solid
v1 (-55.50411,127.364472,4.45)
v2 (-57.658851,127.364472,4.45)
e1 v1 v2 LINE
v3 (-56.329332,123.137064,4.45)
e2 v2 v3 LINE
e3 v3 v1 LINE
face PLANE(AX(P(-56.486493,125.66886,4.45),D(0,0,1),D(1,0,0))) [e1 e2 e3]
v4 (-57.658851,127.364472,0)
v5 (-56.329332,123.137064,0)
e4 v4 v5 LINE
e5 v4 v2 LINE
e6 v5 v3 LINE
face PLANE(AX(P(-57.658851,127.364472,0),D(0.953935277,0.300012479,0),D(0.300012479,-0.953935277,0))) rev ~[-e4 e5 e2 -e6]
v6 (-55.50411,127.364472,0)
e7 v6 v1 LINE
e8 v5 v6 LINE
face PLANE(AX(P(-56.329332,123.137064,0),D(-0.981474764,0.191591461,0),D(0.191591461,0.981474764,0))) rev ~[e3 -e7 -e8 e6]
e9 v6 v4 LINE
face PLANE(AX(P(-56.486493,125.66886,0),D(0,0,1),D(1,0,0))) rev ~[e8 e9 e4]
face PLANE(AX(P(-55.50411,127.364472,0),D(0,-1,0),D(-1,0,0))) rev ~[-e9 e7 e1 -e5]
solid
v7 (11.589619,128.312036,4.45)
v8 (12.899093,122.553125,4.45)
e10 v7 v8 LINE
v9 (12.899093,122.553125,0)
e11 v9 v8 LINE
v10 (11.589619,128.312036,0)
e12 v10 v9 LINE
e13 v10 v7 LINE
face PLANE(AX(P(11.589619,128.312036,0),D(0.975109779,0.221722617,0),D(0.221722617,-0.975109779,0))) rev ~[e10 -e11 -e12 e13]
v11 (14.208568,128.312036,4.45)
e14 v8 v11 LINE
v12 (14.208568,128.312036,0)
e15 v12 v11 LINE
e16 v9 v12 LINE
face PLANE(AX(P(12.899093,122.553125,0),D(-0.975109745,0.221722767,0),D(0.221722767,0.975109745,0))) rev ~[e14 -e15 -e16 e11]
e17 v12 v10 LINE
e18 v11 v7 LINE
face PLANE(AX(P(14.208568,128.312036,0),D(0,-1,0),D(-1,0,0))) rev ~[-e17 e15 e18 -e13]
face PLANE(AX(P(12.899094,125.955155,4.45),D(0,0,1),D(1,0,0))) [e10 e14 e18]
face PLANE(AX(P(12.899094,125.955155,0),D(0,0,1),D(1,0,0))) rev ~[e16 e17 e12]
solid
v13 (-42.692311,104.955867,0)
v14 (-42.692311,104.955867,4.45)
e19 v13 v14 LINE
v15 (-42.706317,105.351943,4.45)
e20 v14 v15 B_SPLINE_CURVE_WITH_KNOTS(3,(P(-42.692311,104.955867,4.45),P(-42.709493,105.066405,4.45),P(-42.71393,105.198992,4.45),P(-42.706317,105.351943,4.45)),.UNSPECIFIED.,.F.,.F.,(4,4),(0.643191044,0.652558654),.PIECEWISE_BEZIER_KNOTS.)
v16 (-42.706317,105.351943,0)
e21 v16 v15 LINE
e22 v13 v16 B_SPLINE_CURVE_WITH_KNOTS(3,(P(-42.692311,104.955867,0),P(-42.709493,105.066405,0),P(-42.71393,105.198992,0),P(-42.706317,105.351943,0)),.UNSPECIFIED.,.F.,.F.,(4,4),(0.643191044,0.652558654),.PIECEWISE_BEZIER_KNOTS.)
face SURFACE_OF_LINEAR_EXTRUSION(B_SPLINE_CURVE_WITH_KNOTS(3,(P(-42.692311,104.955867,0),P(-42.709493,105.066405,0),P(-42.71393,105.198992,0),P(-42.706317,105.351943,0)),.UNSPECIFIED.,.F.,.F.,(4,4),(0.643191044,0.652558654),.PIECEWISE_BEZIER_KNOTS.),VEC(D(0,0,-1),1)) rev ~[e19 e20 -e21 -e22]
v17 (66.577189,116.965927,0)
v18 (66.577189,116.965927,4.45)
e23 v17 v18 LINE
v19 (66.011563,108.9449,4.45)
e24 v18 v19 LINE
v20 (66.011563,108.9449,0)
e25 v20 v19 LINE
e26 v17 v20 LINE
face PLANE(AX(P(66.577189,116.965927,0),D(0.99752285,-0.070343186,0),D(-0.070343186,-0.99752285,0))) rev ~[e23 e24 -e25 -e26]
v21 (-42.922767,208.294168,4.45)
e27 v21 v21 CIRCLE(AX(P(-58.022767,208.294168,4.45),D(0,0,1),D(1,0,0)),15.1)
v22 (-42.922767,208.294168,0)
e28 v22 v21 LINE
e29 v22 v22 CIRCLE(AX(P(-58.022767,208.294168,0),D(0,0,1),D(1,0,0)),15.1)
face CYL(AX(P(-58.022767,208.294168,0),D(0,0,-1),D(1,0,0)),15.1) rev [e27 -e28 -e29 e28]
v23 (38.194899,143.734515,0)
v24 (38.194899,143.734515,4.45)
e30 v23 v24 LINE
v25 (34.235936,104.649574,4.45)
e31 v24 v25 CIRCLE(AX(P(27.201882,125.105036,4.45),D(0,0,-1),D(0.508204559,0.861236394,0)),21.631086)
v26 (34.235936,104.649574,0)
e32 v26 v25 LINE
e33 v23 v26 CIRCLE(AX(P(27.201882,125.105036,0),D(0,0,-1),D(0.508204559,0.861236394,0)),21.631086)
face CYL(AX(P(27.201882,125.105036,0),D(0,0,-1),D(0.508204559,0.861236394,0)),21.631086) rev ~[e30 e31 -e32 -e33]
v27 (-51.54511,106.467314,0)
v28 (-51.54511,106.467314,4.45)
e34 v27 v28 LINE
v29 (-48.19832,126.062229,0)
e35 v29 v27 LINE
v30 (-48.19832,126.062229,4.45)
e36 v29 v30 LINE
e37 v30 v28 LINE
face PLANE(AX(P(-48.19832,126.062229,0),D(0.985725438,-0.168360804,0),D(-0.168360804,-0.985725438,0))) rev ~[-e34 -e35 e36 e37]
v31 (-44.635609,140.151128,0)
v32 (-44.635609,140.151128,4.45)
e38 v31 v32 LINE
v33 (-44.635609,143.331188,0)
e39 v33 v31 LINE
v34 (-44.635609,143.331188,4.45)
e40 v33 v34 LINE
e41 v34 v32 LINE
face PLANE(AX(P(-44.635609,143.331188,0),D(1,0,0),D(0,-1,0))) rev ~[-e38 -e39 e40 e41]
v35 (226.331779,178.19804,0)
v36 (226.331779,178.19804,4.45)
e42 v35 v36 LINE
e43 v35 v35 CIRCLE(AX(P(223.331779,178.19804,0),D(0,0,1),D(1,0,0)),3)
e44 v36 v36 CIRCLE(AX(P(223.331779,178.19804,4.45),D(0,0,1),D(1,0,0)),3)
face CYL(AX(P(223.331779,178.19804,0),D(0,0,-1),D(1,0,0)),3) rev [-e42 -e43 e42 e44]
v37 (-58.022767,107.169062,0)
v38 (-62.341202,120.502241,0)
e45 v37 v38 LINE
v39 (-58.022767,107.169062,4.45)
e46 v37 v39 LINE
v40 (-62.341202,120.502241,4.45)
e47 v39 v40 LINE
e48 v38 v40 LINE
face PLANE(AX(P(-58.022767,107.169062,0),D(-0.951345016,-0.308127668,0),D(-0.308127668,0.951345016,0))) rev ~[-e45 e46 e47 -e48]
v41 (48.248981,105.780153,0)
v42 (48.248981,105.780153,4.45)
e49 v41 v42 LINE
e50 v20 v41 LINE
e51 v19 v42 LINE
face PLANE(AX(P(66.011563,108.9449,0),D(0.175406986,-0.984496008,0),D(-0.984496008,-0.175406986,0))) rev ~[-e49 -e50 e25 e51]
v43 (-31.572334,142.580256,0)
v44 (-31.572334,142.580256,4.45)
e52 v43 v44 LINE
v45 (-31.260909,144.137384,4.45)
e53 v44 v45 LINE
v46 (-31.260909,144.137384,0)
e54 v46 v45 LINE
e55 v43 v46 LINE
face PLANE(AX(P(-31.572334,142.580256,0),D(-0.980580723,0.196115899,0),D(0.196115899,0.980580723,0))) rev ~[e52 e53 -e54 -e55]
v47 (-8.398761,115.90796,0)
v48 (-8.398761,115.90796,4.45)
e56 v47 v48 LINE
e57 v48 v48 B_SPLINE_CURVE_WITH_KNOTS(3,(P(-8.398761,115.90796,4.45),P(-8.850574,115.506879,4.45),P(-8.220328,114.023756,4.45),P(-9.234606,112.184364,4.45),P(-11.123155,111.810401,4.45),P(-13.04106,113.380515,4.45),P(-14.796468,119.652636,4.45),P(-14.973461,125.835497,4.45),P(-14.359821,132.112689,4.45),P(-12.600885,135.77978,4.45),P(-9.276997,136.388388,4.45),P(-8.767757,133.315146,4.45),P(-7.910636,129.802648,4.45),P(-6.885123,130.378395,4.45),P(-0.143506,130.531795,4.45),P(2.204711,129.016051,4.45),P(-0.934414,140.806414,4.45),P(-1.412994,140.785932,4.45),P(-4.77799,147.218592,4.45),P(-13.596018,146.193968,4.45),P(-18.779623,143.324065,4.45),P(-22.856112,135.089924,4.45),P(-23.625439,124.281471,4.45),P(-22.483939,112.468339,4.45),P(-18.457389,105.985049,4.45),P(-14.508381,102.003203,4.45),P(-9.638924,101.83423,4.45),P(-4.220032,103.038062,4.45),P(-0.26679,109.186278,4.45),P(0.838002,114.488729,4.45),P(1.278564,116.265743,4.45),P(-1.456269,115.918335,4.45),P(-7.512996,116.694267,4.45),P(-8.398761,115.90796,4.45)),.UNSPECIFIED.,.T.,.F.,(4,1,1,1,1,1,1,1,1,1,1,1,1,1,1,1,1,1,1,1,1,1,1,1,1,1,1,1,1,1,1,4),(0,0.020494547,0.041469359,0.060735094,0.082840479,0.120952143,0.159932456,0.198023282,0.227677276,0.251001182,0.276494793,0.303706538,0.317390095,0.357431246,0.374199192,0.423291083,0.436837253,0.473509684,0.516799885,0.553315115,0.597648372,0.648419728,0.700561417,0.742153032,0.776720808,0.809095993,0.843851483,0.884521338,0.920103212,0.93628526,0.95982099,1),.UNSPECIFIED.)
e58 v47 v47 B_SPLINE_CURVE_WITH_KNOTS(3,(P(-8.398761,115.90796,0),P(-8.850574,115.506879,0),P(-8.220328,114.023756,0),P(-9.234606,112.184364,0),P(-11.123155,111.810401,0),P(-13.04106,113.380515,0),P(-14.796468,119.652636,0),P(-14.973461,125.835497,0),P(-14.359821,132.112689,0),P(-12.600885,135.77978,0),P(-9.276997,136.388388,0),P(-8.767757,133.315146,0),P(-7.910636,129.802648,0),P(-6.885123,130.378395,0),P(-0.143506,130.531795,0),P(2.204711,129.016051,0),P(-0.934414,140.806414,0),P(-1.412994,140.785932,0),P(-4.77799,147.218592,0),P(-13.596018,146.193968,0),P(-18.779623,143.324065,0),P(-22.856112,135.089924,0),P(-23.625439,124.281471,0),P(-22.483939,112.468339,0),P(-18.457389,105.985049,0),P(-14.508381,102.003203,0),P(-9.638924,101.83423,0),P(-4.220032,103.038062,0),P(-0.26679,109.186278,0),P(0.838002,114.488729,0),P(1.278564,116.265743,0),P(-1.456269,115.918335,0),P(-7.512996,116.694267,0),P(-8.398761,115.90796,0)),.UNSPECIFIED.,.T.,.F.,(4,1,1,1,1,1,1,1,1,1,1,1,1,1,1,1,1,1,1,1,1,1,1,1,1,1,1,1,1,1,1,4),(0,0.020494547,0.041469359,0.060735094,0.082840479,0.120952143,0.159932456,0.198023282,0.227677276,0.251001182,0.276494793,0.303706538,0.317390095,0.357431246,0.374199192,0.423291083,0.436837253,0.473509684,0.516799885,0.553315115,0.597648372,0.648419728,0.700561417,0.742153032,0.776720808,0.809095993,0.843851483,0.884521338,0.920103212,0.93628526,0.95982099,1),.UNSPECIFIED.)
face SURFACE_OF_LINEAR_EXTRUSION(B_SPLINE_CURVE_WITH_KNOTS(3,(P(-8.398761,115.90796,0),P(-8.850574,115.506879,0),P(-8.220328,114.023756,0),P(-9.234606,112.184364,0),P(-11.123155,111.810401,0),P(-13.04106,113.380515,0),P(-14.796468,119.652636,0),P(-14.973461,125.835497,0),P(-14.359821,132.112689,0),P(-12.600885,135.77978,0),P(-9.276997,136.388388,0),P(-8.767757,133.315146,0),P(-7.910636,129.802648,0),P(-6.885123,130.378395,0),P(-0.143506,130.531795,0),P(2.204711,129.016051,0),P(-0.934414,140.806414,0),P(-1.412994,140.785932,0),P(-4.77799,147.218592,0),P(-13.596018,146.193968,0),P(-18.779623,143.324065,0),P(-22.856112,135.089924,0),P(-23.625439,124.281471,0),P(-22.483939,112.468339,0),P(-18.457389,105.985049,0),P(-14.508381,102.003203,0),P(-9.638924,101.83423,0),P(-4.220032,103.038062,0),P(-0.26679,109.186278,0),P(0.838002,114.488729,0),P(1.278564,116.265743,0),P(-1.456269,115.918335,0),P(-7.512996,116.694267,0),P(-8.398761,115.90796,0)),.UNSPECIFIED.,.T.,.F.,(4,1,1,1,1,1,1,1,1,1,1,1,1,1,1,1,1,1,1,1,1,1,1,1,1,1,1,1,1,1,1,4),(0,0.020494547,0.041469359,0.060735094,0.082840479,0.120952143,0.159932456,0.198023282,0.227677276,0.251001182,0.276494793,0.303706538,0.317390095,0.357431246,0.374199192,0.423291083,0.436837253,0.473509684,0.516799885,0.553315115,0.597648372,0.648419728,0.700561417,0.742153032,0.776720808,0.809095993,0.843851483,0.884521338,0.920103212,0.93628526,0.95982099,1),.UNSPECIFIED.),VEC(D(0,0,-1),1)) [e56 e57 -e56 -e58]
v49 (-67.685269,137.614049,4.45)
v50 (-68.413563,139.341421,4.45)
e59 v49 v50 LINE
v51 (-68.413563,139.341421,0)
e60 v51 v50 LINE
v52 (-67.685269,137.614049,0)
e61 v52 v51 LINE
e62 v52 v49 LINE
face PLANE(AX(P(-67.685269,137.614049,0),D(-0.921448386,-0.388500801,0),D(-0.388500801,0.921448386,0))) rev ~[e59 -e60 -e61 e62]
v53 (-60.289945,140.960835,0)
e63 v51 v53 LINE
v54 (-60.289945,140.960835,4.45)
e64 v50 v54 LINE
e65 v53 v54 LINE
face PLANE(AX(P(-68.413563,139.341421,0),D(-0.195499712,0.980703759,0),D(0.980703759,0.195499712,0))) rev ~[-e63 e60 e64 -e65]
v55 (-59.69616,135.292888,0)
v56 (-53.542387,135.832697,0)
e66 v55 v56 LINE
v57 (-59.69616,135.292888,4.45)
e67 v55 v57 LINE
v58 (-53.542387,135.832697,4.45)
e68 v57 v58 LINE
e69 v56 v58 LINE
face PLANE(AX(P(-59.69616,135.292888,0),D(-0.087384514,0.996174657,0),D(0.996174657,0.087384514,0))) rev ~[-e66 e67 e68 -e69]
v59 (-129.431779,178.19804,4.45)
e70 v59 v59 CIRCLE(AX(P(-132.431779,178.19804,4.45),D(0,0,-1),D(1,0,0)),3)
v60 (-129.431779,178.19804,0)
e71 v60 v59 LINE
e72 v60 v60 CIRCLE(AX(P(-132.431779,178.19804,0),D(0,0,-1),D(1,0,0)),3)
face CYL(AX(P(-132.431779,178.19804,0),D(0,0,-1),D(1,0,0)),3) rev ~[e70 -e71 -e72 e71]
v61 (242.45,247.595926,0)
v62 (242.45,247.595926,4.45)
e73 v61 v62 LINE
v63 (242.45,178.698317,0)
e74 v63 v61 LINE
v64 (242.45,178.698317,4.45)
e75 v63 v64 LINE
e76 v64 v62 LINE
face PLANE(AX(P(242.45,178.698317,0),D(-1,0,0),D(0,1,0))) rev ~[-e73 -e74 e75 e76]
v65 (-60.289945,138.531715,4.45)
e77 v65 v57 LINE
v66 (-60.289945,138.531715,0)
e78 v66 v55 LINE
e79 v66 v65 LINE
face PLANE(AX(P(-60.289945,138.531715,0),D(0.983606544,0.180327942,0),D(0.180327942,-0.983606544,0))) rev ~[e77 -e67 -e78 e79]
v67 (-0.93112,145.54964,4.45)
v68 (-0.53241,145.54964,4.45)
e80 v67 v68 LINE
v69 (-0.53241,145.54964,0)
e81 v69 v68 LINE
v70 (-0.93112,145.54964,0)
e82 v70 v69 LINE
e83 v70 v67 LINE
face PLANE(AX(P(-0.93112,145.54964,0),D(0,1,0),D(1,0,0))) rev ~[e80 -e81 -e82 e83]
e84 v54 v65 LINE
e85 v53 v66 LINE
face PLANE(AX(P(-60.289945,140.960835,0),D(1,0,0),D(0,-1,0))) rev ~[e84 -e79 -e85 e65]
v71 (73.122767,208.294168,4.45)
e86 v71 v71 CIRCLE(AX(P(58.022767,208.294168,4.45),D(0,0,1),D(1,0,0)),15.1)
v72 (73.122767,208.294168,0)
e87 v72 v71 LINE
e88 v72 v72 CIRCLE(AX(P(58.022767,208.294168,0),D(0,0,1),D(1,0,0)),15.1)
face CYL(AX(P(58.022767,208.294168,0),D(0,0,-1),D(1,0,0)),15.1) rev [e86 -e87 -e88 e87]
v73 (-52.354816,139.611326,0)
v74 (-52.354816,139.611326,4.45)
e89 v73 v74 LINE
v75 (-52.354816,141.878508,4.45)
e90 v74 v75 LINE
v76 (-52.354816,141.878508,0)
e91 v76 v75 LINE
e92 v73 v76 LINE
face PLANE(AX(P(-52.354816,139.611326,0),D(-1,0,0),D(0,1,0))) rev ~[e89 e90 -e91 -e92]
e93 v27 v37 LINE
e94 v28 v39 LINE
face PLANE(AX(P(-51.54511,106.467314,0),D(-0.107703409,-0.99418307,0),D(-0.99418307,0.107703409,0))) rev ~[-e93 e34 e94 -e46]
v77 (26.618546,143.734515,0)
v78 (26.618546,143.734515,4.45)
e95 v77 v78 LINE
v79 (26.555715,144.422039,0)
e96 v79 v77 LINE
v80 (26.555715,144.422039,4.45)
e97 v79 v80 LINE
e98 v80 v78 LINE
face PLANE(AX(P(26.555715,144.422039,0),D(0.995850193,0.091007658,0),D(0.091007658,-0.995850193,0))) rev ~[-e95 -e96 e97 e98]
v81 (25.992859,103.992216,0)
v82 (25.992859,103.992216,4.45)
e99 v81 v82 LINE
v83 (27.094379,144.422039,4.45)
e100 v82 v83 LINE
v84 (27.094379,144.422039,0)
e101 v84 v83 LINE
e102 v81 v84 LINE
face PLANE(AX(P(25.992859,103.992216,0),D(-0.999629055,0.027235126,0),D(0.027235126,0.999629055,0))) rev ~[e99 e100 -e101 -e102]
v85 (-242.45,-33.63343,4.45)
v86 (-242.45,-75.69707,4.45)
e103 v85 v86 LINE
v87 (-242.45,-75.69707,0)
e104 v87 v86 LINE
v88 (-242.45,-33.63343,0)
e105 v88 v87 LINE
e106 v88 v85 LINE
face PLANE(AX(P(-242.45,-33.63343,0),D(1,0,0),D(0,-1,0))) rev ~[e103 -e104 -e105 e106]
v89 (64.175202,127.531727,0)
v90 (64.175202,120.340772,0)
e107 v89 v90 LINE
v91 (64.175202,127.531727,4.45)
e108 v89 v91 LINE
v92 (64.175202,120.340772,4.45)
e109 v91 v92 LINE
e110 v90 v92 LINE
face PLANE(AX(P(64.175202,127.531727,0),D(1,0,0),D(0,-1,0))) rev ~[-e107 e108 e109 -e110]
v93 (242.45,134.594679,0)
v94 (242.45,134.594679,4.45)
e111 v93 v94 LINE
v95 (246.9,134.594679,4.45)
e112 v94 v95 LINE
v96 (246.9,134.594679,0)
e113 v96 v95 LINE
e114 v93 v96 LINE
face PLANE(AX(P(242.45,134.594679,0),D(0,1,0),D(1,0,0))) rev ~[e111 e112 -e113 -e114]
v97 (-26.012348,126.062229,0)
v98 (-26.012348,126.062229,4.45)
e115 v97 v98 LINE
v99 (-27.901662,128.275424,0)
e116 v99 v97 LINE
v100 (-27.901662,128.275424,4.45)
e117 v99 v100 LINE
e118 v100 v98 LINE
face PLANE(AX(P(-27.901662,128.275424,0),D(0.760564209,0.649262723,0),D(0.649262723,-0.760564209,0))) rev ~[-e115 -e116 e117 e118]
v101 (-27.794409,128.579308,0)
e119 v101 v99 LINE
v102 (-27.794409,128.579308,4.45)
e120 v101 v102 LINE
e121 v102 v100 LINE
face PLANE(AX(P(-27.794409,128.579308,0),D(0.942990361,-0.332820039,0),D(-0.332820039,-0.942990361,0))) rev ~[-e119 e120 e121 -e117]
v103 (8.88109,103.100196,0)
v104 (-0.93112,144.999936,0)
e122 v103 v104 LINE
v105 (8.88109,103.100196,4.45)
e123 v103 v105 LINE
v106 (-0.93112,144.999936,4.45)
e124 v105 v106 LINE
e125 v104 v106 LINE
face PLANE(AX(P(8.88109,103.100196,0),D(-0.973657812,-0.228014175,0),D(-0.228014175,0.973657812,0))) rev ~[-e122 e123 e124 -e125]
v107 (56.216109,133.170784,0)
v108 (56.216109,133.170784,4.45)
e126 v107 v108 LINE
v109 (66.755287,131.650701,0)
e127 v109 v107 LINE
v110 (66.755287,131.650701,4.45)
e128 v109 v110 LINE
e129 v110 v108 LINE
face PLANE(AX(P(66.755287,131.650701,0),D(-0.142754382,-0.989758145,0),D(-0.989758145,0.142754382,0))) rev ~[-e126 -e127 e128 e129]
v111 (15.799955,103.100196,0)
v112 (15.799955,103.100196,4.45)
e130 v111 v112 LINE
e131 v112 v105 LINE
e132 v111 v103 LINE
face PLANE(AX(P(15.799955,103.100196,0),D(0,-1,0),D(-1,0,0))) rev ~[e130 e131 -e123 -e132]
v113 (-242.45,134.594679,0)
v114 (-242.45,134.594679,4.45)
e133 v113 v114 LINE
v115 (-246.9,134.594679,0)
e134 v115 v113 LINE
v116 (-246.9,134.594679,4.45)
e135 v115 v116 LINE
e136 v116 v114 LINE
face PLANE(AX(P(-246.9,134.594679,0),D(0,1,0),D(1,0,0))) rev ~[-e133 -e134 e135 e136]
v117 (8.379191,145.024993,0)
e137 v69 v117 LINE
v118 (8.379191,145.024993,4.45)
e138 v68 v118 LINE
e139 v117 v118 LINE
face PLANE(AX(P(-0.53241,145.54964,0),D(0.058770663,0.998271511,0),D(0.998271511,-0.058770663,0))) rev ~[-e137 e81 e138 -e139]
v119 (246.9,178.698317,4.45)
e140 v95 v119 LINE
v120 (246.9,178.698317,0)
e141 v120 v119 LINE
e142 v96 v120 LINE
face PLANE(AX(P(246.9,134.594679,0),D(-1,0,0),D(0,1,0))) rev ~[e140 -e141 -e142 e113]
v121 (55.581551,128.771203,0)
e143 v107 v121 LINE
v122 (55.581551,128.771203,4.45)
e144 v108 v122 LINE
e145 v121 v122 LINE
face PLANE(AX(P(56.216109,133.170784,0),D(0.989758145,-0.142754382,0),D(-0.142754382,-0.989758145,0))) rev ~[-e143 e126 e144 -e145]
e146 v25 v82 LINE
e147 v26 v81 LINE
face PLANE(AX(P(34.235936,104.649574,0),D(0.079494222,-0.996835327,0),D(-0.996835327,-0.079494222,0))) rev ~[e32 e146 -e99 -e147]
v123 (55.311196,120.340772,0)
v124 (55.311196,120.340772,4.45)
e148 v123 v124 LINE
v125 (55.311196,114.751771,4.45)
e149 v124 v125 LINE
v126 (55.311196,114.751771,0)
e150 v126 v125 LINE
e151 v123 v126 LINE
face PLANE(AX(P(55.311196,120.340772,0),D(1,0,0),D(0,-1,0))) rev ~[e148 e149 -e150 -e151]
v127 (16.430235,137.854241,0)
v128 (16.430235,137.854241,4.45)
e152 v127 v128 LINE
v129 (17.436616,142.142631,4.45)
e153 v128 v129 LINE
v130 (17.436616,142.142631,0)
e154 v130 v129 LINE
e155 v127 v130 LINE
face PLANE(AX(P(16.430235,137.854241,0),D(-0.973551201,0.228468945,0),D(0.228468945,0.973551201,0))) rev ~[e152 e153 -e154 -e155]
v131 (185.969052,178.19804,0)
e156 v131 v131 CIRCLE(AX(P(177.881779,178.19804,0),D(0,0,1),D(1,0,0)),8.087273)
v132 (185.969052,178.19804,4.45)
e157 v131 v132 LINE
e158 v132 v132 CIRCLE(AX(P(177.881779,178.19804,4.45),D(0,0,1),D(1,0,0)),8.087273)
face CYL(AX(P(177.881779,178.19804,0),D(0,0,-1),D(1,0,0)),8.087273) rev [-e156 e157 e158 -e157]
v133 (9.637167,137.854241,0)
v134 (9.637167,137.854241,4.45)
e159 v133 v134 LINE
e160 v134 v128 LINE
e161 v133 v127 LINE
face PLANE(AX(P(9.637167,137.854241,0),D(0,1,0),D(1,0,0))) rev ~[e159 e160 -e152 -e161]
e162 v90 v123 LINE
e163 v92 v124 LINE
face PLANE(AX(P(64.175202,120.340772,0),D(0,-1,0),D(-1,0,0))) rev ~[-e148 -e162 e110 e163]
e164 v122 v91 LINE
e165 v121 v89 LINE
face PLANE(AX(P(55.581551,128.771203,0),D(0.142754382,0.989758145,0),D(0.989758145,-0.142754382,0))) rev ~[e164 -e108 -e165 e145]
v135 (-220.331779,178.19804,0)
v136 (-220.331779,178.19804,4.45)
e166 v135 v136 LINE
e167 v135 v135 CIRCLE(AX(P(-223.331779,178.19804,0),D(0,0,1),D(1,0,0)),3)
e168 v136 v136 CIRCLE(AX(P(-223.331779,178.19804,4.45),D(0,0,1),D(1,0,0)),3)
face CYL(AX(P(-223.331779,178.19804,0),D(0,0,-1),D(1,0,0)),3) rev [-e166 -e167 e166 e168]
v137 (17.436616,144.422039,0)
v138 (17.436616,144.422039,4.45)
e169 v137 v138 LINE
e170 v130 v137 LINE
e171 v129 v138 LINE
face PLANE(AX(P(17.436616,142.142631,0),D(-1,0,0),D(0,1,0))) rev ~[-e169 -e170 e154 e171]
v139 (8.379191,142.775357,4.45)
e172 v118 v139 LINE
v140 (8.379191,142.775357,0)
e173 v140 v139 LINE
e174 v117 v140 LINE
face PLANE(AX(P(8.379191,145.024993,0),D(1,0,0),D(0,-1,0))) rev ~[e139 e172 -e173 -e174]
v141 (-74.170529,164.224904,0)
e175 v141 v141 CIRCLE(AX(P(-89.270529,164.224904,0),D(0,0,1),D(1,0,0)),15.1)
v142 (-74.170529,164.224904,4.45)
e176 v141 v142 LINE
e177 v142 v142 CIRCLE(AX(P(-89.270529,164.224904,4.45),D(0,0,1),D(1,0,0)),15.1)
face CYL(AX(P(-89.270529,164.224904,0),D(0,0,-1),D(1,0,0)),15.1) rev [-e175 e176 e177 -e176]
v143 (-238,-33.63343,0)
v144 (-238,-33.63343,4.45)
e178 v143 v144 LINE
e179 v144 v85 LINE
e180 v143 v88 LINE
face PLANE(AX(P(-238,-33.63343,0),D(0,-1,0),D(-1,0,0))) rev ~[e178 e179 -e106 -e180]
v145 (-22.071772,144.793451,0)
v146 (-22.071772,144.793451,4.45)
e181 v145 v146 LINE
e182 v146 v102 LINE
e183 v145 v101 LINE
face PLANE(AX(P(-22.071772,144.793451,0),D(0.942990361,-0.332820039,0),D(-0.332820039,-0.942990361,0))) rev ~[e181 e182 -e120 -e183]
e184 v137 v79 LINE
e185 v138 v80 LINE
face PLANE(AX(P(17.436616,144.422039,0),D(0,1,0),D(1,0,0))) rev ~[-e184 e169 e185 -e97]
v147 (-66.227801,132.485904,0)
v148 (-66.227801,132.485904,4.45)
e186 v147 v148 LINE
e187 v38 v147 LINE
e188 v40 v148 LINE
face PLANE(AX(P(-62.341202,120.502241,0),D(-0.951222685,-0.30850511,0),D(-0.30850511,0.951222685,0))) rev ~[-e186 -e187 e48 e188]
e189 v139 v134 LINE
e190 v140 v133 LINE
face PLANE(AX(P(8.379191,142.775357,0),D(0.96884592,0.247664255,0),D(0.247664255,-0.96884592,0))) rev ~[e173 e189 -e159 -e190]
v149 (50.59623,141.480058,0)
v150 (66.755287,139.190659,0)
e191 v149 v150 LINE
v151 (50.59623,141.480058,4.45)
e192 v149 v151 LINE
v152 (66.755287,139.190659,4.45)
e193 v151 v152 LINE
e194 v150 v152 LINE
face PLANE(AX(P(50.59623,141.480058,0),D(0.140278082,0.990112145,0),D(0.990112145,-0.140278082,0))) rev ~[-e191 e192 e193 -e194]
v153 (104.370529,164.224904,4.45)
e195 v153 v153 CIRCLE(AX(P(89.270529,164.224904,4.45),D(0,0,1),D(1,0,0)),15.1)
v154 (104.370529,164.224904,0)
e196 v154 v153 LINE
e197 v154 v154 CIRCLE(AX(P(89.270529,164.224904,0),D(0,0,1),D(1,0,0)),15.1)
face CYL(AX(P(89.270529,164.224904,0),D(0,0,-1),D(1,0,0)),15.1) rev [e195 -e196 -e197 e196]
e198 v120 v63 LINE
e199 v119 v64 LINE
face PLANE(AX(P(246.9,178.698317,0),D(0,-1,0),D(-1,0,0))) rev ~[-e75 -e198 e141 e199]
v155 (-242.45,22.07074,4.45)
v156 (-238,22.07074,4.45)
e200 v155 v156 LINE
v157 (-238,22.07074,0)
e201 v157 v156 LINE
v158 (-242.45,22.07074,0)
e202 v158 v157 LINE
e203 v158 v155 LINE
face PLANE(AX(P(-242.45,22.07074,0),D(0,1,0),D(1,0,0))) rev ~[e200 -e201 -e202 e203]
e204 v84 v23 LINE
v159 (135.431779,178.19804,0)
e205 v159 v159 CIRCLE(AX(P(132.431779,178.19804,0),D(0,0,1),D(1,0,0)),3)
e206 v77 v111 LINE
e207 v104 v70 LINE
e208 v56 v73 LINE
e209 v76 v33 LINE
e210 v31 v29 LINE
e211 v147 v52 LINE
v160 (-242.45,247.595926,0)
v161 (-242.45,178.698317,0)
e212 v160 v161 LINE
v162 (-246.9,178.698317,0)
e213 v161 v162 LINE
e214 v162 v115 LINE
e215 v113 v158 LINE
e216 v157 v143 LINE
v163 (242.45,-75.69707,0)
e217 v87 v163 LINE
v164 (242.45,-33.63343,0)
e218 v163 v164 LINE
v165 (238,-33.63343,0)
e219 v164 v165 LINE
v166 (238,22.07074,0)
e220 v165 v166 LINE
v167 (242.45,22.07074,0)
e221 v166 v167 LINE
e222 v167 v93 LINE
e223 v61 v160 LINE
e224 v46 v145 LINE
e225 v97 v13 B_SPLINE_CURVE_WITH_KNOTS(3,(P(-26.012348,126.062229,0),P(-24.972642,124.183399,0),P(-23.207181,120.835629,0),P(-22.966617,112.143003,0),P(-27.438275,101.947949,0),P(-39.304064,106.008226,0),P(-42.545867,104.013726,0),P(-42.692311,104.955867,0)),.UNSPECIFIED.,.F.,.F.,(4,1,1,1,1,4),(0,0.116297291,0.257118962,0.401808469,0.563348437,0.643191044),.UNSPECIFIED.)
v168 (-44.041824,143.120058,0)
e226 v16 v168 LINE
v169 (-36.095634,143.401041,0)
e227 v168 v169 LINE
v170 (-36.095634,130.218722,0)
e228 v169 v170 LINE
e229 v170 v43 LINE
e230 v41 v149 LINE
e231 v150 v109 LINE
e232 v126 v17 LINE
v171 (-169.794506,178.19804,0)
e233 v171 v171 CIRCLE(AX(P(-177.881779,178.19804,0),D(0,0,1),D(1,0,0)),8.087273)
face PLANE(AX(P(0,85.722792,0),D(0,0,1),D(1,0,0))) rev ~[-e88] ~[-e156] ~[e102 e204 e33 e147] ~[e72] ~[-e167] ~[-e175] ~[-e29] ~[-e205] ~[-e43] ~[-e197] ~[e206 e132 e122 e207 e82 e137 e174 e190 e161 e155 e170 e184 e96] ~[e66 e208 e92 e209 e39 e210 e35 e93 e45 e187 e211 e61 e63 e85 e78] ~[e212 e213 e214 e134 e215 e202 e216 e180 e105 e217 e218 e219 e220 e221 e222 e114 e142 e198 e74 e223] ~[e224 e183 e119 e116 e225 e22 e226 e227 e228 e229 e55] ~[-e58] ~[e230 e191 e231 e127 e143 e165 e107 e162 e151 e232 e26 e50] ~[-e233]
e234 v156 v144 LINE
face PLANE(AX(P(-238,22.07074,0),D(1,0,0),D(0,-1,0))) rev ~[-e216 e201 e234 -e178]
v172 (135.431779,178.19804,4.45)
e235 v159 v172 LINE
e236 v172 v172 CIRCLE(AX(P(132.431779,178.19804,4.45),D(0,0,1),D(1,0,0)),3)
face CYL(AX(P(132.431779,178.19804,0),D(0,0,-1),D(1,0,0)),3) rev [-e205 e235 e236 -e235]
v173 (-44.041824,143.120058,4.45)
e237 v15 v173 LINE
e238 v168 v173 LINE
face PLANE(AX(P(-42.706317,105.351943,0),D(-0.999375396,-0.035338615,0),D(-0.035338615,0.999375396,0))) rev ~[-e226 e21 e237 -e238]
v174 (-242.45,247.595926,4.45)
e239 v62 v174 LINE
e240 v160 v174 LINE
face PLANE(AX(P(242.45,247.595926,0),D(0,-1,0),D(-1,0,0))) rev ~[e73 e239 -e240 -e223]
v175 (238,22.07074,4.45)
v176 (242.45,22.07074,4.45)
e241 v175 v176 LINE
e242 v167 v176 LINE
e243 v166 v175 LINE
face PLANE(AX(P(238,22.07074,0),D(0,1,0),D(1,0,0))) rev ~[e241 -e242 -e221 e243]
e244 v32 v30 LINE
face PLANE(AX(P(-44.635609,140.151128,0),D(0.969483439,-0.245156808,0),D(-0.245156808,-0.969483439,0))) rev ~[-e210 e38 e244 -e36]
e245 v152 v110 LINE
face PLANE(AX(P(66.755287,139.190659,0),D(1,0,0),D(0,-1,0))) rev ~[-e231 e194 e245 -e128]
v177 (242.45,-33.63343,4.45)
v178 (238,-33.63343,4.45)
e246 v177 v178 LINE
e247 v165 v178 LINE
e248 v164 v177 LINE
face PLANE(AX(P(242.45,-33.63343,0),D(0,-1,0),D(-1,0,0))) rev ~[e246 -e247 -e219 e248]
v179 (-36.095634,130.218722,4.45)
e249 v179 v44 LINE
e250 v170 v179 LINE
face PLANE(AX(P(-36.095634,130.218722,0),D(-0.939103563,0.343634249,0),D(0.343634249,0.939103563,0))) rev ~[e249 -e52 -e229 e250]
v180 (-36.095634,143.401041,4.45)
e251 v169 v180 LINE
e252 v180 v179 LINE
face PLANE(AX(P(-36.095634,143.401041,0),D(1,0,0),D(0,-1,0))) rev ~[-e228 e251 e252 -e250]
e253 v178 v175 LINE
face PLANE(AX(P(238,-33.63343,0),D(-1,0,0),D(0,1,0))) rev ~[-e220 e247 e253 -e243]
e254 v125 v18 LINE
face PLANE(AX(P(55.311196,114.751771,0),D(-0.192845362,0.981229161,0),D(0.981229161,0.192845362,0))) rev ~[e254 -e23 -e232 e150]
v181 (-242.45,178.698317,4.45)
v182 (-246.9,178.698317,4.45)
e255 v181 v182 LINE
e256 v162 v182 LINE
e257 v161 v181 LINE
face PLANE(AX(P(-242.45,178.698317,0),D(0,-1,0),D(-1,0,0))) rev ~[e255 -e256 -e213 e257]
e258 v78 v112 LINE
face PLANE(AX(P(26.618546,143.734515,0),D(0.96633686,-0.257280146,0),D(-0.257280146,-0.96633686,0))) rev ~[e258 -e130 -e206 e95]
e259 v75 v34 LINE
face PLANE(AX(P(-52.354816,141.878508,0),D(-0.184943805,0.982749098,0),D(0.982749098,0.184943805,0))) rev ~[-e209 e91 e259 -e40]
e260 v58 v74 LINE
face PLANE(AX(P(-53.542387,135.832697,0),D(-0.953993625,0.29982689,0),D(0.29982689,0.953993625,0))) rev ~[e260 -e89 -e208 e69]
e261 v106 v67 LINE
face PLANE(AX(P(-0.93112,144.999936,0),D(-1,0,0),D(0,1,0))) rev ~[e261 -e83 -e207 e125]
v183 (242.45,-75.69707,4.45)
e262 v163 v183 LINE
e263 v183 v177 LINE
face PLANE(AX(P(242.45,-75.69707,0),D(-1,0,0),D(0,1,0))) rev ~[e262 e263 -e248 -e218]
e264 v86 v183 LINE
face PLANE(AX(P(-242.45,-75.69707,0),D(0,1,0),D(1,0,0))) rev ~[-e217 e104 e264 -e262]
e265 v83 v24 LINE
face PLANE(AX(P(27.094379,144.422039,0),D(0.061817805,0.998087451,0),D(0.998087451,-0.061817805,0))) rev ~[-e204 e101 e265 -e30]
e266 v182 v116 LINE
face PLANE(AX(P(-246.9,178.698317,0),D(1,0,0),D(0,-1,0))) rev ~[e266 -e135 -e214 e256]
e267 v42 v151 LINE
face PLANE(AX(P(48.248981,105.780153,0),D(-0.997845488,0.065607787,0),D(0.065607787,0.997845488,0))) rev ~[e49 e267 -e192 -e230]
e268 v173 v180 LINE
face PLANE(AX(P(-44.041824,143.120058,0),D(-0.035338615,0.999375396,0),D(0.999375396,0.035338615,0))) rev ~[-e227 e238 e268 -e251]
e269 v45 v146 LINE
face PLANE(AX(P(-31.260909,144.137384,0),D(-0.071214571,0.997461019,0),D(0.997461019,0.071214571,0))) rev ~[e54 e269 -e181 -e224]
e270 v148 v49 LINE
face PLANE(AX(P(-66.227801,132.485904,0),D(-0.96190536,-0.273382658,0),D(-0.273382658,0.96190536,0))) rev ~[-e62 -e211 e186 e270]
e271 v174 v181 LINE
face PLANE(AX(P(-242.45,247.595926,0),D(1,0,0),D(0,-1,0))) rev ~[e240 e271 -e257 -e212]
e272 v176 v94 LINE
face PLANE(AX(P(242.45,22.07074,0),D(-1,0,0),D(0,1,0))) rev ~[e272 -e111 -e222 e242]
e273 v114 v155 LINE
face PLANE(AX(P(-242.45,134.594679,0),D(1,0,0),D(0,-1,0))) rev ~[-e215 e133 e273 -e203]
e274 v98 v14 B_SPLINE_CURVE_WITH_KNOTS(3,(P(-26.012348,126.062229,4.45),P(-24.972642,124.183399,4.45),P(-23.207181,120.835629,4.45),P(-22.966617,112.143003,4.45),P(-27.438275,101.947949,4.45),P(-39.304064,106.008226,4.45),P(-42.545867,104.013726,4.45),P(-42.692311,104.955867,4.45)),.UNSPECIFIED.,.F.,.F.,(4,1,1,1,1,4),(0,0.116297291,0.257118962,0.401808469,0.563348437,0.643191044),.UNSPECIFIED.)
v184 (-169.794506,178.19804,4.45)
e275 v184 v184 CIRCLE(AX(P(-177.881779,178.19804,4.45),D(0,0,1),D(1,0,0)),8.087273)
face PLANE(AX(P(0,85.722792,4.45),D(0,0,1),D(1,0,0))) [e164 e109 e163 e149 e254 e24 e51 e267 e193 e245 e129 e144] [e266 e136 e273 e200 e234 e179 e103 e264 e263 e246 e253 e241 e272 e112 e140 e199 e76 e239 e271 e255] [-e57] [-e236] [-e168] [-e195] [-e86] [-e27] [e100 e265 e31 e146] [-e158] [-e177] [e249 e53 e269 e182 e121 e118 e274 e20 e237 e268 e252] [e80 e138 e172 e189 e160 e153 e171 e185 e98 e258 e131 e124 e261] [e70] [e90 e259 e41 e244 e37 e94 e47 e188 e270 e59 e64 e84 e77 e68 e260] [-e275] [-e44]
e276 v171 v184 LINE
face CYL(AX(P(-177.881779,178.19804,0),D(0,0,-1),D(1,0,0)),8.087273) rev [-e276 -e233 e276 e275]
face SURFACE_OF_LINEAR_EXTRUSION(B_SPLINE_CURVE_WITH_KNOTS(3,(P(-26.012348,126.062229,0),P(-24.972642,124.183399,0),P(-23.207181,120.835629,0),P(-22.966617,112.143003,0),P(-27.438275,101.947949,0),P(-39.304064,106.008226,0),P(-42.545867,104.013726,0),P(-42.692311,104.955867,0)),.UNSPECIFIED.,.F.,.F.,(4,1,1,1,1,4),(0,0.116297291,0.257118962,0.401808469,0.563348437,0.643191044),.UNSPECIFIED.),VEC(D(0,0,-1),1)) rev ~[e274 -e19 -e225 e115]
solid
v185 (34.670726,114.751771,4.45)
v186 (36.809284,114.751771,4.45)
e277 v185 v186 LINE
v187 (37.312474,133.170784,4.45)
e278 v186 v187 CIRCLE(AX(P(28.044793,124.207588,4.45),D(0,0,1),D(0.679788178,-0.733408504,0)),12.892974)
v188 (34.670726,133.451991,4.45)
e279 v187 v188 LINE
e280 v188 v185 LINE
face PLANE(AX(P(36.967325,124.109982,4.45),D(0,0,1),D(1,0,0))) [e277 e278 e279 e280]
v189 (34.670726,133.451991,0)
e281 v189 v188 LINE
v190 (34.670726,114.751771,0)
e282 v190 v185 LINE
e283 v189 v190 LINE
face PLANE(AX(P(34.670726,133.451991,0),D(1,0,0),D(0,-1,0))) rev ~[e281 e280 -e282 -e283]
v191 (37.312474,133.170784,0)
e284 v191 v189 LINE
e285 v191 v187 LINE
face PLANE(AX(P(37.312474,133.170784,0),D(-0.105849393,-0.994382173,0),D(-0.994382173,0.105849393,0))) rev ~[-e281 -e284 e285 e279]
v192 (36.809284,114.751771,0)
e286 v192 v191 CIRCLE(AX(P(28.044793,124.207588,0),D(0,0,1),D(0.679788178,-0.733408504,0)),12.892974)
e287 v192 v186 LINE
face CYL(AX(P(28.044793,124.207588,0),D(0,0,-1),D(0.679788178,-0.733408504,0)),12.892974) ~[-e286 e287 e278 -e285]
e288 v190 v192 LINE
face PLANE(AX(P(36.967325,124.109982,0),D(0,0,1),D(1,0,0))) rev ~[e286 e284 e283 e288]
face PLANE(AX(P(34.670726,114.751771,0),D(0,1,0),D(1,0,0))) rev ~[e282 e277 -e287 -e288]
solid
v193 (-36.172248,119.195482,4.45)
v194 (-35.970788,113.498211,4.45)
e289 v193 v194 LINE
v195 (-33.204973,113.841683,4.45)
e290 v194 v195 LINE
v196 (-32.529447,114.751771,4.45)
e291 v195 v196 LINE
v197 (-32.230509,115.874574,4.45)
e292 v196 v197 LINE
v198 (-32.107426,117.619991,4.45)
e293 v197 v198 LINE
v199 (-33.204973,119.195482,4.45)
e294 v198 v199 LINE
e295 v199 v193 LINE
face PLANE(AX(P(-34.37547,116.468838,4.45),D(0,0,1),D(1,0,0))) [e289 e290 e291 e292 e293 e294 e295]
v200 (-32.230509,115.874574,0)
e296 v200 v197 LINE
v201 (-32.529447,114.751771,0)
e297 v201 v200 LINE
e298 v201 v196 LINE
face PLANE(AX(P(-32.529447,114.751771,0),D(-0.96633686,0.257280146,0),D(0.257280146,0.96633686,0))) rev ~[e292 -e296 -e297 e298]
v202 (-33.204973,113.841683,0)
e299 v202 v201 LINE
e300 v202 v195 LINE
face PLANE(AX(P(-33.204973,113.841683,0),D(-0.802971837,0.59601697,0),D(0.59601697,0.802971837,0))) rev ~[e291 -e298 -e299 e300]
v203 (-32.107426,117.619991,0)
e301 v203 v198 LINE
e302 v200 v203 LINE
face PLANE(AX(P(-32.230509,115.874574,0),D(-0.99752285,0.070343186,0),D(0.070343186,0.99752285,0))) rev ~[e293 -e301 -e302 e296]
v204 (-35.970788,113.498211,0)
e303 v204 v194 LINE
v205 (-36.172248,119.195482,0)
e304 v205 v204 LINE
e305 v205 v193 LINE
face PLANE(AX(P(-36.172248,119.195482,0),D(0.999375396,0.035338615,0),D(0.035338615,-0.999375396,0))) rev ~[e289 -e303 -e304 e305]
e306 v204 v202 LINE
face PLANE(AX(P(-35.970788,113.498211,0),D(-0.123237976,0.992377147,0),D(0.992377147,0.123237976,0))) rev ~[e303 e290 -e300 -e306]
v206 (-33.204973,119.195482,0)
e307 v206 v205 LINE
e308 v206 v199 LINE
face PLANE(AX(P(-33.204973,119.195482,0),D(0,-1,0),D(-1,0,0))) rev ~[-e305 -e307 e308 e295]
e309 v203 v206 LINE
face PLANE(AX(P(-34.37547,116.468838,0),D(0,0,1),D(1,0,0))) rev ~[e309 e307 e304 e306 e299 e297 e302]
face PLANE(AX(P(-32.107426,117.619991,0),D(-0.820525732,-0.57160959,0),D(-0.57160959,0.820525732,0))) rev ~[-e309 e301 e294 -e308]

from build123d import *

# Parameters (mm, degrees)
F0_R     = 15.1
F0_R_2   = 3
F0_R_3   = 8.087272744
F1_DEPTH = 4.45


with BuildPart() as f1:
    # F0 (on Top) → F1 (new body)
    with BuildSketch(Plane.XY):
        Polygon((242.45, -33.63343), (238, -33.63343), (238, -28.2489694095), (238, 22.07074), (242.45, 22.07074), (242.45, 75.69707), (242.45, 134.5946788788), (246.9, 134.5946788788), (246.9, 178.6983170484), (242.45, 178.6983170484), (242.45, 237.5959259272), (242.45, 247.5959259272), (232.45, 247.5959259272), (-232.45, 247.5959259272), (-242.45, 247.5959259272), (-242.45, 237.5959259272), (-242.45, 178.6983170484), (-246.9, 178.6983170484), (-246.9, 134.5946788788), (-242.45, 134.5946788788), (-242.45, 75.69707), (-242.45, 22.07074), (-238, 22.07074), (-238, -33.63343), (-242.45, -33.63343), (-242.45, -75.69707), (-238, -75.69707), (238, -75.69707), (242.45, -75.69707), align=None)
        Polygon((-68.4135630727, 139.3414214253), (-60.2899454534, 140.9608349204), (-60.2899454534, 138.5317146778), (-59.6961602569, 135.2928876877), (-53.5423867404, 135.8326971531), (-52.3548163474, 139.611326158), (-52.3548163474, 141.8785080314), (-44.6356087923, 143.3311876865), (-44.6356087923, 140.1511281729), (-48.1983199716, 126.0622292757), (-51.5451095998, 106.4673140645), (-58.0227673054, 107.1690618992), (-62.3412020504, 120.5022409558), (-66.2278011441, 132.4859037995), (-67.6852688193, 137.6140490174), align=None, mode=Mode.SUBTRACT)
        with BuildLine():
            add(Edge.make_bspline(
                [(-27.7944092972, 128.5793082409), (-27.0867796861, 127.9867854546), (-26.5207327972, 126.9809206754), (-26.0123479414, 126.0622292782)],
                knots=[0.9431341245, 0.9431341245, 0.9431341245, 0.9431341245, 1, 1, 1, 1], degree=3))
            add(Edge.make_bspline(
                [(-26.0123479414, 126.0622292782), (-24.9726421233, 124.183399136), (-24.1741076418, 122.6691714867), (-23.7052644837, 120.7018569136)],
                knots=[0, 0, 0, 0, 0.1162972911, 0.1162972911, 0.1162972911, 0.1162972911], degree=3))
            add(Edge.make_bspline(
                [(-23.7052644837, 120.7018569136), (-23.1375532635, 118.3196816861), (-22.9666166078, 112.1430032153), (-27.438275439, 101.9479490434), (-39.3040642123, 106.008225837), (-42.5458674044, 104.0137255763), (-42.6923110384, 104.9558669353)],
                knots=[0.1162972911, 0.1162972911, 0.1162972911, 0.1162972911, 0.2571189623, 0.4018084692, 0.5633484367, 0.6431910445, 0.6431910445, 0.6431910445, 0.6431910445], degree=3))
            add(Edge.make_bspline(
                [(-42.6923110384, 104.9558669353), (-42.7094926771, 105.0664045668), (-42.7139295815, 105.1989924947), (-42.7063165735, 105.351943218)],
                knots=[0.6431910445, 0.6431910445, 0.6431910445, 0.6431910445, 0.6525586544, 0.6525586544, 0.6525586544, 0.6525586544], degree=3))
            Line((-42.7063165735, 105.351943218), (-44.0418235958, 143.1200578809))
            Line((-44.0418235958, 143.1200578809), (-36.0956337116, 143.401040728))
            Line((-36.0956337116, 143.401040728), (-36.0956337116, 130.2187219407))
            Line((-36.0956337116, 130.2187219407), (-31.5723344689, 142.5802558806))
            Line((-31.5723344689, 142.5802558806), (-31.2609091575, 144.1373843915))
            Line((-31.2609091575, 144.1373843915), (-22.0717723521, 144.793450565))
            Line((-22.0717723521, 144.793450565), (-27.7944092972, 128.5793082409))
        make_face(mode=Mode.SUBTRACT)
        with BuildLine():
            add(Edge.make_bspline(
                [(-8.3987614374, 115.9079596425), (-8.8505736963, 115.5068793363), (-8.2203283958, 114.0237563809), (-9.2346055247, 112.1843642837), (-11.1231552667, 111.810401025), (-13.0410600618, 113.3805151721), (-14.7964680369, 119.6526358134), (-14.9734613535, 125.835496877), (-14.3598206307, 132.1126885852), (-12.600885128, 135.7797795043), (-9.2769967864, 136.3883881539), (-8.7677567263, 133.3151455163), (-7.9106360899, 129.8026476212), (-6.8851230427, 130.3783952995), (-0.1435064114, 130.5317951707), (2.2047108084, 129.0160512993), (-0.9344140221, 140.8064141996), (-1.4129937988, 140.7859317655), (-4.7779902553, 147.2185915739), (-13.5960178433, 146.1939684974), (-18.7796230071, 143.3240652812), (-22.8561119513, 135.0899237079), (-23.625439333, 124.2814713806), (-22.4839389086, 112.4683388285), (-18.4573892555, 105.9850491154), (-14.5083812426, 102.0032027615), (-9.6389238746, 101.8342302081), (-4.2200323299, 103.0380617438), (-0.266790425, 109.186277671), (0.8380024016, 114.4887293174), (1.2785639857, 116.2657429546), (-1.4562686379, 115.9183349605), (-7.5129956046, 116.6942668408), (-8.3987614374, 115.9079596425)],
                knots=[0, 0, 0, 0, 0.020494547, 0.0414693591, 0.0607350939, 0.0828404788, 0.1209521426, 0.159932456, 0.1980232824, 0.2276772762, 0.2510011815, 0.2764947931, 0.3037065377, 0.3173900946, 0.3574312462, 0.3741991924, 0.4232910827, 0.4368372532, 0.4735096835, 0.516799885, 0.5533151147, 0.5976483724, 0.648419728, 0.7005614172, 0.7421530316, 0.776720808, 0.8090959926, 0.8438514827, 0.8845213381, 0.9201032118, 0.9362852602, 0.9598209895, 1, 1, 1, 1], degree=3))
        make_face(mode=Mode.SUBTRACT)
        with Locations((-89.2705285023, 164.2249039248)):
            Circle(F0_R, mode=Mode.SUBTRACT)
        with Locations((-223.3317792416, 178.1980395317)):
            Circle(F0_R_2, mode=Mode.SUBTRACT)
        with Locations((-177.8817792416, 178.1980395317)):
            Circle(F0_R_3, mode=Mode.SUBTRACT)
        with BuildLine():
            ThreePointArc((-135.4317792416, 178.1980395317), (-132.4317792416, 181.1980395317), (-129.4317792416, 178.1980395317))
            ThreePointArc((-129.4317792416, 178.1980395317), (-132.4317792416, 175.1980395317), (-135.4317792416, 178.1980395317))
        make_face(mode=Mode.SUBTRACT)
        with Locations((-58.0227673054, 208.2941681147)):
            Circle(F0_R, mode=Mode.SUBTRACT)
        Polygon((26.5557151985, 144.4220393921), (26.6185459447, 143.7345147158), (15.7999546033, 103.1001955295), (8.8810902786, 103.1001955295), (-0.9311196221, 144.9999362255), (-0.9311196221, 145.5496400619), (-0.532409514, 145.5496400619), (8.3791912299, 145.024992528), (8.3791912299, 142.775356772), (9.6371668157, 137.8542408372), (16.4302346062, 137.8542408372), (17.4366161924, 142.142631116), (17.4366161924, 144.4220393921), align=None, mode=Mode.SUBTRACT)
        with BuildLine():
            Line((25.9928592246, 103.9922162915), (27.0943791371, 144.4220393921))
            Line((27.0943791371, 144.4220393921), (38.1948985856, 143.7345147158))
            ThreePointArc((38.1948985856, 143.7345147158), (48.7228479864, 122.9251507383), (34.2359357279, 104.649573567))
            Line((34.2359357279, 104.649573567), (25.9928592246, 103.9922162915))
        make_face(mode=Mode.SUBTRACT)
        Polygon((56.2161091041, 133.1707835222), (55.5815506879, 128.7712032755), (64.17520246, 127.5317272908), (64.17520246, 120.3407719756), (55.311195622, 120.3407719756), (55.311195622, 114.7517710949), (66.5771887403, 116.9659271861), (66.0115630132, 108.9449003363), (48.2489814485, 105.7801532266), (50.5962303516, 141.4800577086), (66.7552874189, 139.1906589294), (66.7552874189, 131.6507011677), align=None, mode=Mode.SUBTRACT)
        with Locations((89.2705285023, 164.2249039248)):
            Circle(F0_R, mode=Mode.SUBTRACT)
        with Locations((58.0227673054, 208.2941681147)):
            Circle(F0_R, mode=Mode.SUBTRACT)
        with Locations((132.4317792416, 178.1980395317)):
            Circle(F0_R_2, mode=Mode.SUBTRACT)
        with Locations((177.8817792416, 178.1980395317)):
            Circle(F0_R_3, mode=Mode.SUBTRACT)
        with Locations((223.3317792416, 178.1980395317)):
            Circle(F0_R_2, mode=Mode.SUBTRACT)
        with BuildLine():
            Line((-27.7944092972, 128.5793082409), (-27.9016624439, 128.2754242445))
            Line((-27.9016624439, 128.2754242445), (-26.0123479414, 126.0622292782))
            add(Edge.make_bspline(
                [(-27.7944092972, 128.5793082409), (-27.0867796861, 127.9867854546), (-26.5207327972, 126.9809206754), (-26.0123479414, 126.0622292782)],
                knots=[0.9431341245, 0.9431341245, 0.9431341245, 0.9431341245, 1, 1, 1, 1], degree=3))
        make_face()
    extrude(amount=F1_DEPTH)


with BuildPart() as f1b:
    # F0 (on Top) → F1, piece 2 (new body)
    with BuildSketch(Plane.XY):
        Polygon((-33.2049726743, 119.1954817825), (-36.1722478731, 119.1954817825), (-35.9707883793, 113.4982109094), (-33.2049726743, 113.841682675), (-32.5294469364, 114.7517710949), (-32.2305089116, 115.8745737529), (-32.1074257839, 117.619991305), align=None)
    extrude(amount=F1_DEPTH)


with BuildPart() as f1c:
    # F0 (on Top) → F1, piece 3 (new body)
    with BuildSketch(Plane.XY):
        Polygon((12.8990933996, 122.5531250263), (14.2085683298, 128.3120363975), (11.5896194008, 128.3120363975), align=None)
    extrude(amount=F1_DEPTH)


with BuildPart() as f1d:
    # F0 (on Top) → F1, piece 4 (new body)
    with BuildSketch(Plane.XY):
        with BuildLine():
            Line((34.6707255345, 114.7517710949), (36.8092843097, 114.7517710949))
            ThreePointArc((36.8092843097, 114.7517710949), (40.9329586351, 123.8554957905), (37.3124741715, 133.1707835222))
            Line((37.3124741715, 133.1707835222), (34.6707255345, 133.4519907857))
            Line((34.6707255345, 133.4519907857), (34.6707255345, 114.7517710949))
        make_face()
    extrude(amount=F1_DEPTH)


with BuildPart() as f1e:
    # F0 (on Top) → F1, piece 5 (new body)
    with BuildSketch(Plane.XY):
        Polygon((-57.658851077, 127.3644715572), (-56.3293322224, 123.1370642806), (-55.5041096408, 127.3644715572), align=None)
    extrude(amount=F1_DEPTH)


solid = Compound([f1.part, f1b.part, f1c.part, f1d.part, f1e.part])
